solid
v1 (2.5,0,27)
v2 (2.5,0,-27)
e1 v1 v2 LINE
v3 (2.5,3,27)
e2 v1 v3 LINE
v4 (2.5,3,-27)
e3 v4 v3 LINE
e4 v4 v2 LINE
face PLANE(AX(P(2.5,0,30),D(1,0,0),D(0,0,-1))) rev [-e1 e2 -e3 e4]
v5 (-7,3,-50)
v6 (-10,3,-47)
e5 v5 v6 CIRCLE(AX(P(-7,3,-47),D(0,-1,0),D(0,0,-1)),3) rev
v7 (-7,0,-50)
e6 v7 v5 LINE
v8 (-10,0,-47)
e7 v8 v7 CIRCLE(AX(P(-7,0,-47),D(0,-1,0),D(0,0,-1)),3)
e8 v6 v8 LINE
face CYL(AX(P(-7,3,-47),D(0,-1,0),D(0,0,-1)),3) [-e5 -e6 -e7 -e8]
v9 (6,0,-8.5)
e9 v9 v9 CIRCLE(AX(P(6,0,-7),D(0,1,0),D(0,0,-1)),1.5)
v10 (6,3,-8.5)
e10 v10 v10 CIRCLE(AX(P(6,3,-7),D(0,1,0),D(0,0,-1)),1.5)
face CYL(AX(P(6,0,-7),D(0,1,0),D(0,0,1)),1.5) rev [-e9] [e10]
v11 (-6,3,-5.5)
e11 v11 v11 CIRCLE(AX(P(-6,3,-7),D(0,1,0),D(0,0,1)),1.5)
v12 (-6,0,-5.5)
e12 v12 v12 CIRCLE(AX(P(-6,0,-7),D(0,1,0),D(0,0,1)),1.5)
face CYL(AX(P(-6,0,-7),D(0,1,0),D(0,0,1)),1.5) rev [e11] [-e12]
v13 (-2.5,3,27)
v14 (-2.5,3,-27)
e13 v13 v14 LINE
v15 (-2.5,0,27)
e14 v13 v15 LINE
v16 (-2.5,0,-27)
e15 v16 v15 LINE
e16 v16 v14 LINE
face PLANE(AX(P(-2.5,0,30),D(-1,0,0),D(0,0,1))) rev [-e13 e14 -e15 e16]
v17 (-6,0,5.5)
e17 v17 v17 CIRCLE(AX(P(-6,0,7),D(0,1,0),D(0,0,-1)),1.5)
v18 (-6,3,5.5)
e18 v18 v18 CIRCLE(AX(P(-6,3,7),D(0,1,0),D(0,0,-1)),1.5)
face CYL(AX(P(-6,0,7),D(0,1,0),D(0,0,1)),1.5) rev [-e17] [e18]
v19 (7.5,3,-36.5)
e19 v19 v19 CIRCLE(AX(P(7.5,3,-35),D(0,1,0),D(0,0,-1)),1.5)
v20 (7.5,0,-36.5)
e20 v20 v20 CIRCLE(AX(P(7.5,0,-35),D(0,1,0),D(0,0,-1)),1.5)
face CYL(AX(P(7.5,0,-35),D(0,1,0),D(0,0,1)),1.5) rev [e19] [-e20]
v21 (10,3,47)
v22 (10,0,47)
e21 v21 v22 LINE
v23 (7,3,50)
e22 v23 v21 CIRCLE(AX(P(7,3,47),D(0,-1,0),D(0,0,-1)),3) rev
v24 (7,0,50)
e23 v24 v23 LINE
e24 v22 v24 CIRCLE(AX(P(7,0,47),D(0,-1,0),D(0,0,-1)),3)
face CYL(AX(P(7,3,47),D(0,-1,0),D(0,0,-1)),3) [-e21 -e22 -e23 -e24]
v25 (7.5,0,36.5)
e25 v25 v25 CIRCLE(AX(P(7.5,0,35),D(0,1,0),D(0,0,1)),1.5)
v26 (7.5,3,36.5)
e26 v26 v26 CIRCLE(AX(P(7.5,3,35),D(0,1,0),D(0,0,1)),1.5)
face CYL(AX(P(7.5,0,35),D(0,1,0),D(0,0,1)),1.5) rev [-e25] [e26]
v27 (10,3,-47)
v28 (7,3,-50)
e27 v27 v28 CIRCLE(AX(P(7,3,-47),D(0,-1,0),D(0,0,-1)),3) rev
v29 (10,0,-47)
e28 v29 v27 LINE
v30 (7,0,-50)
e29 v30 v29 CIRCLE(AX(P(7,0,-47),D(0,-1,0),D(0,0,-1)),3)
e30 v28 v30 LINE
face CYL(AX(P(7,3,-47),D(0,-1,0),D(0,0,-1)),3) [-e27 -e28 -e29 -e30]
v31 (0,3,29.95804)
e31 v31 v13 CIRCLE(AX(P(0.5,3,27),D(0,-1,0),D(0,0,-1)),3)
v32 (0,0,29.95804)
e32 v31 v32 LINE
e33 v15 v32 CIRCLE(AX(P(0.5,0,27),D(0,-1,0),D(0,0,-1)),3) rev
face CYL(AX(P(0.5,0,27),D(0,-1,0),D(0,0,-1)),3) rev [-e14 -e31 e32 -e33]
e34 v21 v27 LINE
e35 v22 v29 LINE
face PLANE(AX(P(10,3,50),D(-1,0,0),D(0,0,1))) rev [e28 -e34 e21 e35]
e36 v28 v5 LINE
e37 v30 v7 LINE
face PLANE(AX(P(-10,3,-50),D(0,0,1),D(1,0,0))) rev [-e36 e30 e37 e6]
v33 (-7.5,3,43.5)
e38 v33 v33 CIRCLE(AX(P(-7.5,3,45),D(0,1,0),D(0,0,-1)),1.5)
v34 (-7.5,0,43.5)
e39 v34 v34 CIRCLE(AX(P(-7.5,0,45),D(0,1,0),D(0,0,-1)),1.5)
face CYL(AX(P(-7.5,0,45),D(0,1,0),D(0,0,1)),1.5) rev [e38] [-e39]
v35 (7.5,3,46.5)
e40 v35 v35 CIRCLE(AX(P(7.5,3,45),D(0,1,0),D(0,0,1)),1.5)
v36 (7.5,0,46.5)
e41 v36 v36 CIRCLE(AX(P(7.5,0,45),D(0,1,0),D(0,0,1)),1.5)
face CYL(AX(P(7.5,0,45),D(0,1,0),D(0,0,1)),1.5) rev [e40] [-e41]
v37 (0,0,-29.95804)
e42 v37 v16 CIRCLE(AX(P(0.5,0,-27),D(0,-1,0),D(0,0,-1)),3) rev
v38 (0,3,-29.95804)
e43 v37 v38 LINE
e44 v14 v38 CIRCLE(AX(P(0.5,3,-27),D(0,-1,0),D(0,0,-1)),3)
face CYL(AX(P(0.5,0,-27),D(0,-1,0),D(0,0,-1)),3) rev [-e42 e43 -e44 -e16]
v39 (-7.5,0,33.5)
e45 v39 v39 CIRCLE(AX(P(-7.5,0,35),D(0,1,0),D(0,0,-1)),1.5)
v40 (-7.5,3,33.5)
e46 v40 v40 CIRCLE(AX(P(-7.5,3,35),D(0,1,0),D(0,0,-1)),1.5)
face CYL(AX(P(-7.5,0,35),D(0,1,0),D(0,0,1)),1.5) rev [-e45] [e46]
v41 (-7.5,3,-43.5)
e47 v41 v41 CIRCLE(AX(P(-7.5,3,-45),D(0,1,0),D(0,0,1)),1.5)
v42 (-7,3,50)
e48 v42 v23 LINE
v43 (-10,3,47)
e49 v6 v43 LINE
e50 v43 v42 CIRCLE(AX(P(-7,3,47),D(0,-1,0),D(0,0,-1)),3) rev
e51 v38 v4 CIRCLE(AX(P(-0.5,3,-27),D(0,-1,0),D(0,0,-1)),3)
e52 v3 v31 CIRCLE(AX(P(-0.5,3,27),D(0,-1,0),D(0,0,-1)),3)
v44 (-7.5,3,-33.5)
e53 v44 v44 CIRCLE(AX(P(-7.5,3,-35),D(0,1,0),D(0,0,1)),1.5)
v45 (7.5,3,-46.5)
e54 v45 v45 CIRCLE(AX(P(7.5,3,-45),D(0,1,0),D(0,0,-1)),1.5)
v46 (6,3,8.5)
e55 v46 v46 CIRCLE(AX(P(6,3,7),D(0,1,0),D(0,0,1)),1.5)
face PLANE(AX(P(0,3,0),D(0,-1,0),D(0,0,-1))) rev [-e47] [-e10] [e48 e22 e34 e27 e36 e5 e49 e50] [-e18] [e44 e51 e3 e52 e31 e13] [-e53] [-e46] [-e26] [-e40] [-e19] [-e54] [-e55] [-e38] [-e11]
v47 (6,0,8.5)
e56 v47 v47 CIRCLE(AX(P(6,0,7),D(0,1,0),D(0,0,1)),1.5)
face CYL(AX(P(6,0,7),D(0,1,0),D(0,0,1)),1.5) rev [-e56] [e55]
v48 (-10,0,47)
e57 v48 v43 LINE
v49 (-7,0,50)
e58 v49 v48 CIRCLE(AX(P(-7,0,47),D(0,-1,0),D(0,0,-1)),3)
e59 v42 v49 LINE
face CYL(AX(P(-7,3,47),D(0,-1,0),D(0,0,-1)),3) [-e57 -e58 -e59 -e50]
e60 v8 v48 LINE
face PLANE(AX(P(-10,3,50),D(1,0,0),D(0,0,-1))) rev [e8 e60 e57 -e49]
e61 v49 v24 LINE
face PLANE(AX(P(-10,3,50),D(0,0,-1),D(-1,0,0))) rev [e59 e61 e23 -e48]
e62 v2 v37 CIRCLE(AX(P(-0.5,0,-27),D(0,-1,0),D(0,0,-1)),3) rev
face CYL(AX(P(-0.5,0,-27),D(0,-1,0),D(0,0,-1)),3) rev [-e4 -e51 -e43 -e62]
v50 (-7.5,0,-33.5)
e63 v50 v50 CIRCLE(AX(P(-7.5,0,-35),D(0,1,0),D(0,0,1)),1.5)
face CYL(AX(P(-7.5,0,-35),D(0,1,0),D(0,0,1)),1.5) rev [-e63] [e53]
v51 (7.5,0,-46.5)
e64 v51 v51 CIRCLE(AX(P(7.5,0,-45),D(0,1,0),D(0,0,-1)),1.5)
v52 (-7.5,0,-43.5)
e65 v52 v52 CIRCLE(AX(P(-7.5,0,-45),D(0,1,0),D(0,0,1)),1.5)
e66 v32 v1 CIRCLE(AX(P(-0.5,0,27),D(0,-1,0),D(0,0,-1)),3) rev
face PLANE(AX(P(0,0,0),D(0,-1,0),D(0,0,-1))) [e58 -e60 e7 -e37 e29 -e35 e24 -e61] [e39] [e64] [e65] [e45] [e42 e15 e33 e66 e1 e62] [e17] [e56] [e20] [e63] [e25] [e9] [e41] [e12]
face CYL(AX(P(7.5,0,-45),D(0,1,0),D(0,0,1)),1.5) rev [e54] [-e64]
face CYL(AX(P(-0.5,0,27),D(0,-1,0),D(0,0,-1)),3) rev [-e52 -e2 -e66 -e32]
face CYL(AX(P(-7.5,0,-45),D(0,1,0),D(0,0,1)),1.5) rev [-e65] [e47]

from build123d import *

# Parameters (mm, degrees)
SKETCH_1_W               = 20
SKETCH_1_H               = 100
EXTRUDE_1_DEPTH          = 3
SKETCH_2_R               = 1.5
CUT_EXTRUDE_1_DEPTH      = 52.078371156
CUT_EXTRUDE_2_DEPTH      = 52.078371156
CUT_EXTRUDE_2_DEPTH_BACK = 52.078371156
SKETCH_3_W               = 5
SKETCH_3_H               = 60
FILLET_1_R               = 3
FILLET_2_R               = 3
SKETCH_4_R               = 1.5
CUT_EXTRUDE_3_DEPTH      = 52.078371156


with BuildPart() as part:
    # 草图1 → 凸台-拉伸1 (new body)
    with BuildSketch(Plane(origin=(0, 0, 0), x_dir=(1, 0, 0), z_dir=(0, 1, 0))):
        Rectangle(SKETCH_1_W, SKETCH_1_H)
    extrude(amount=EXTRUDE_1_DEPTH)

    # 草图2 → 切除-拉伸1 (cut, through all)
    with BuildSketch(Plane(origin=(0, 3, 0), x_dir=(1, 0, 0), z_dir=(0, 1, 0))):
        with Locations(Location((-7.5, 45, 0), (0, 0, 270))):
            Circle(SKETCH_2_R)
        with Locations(Location((-7.5, 35, 0), (0, 0, 270))):
            Circle(SKETCH_2_R)
        with Locations(Location((7.5, 45, 0), (0, 0, 90))):
            Circle(SKETCH_2_R)
        with Locations(Location((7.5, 35, 0), (0, 0, 90))):
            Circle(SKETCH_2_R)
        with Locations(Location((7.5, -35, 0), (0, 0, 270))):
            Circle(SKETCH_2_R)
        with Locations(Location((7.5, -45, 0), (0, 0, 270))):
            Circle(SKETCH_2_R)
        with Locations(Location((-7.5, -35, 0), (0, 0, 90))):
            Circle(SKETCH_2_R)
        with Locations(Location((-7.5, -45, 0), (0, 0, 90))):
            Circle(SKETCH_2_R)
    extrude(amount=-CUT_EXTRUDE_1_DEPTH, mode=Mode.SUBTRACT)

    # 草图3 → 切除-拉伸2 (cut, two sides: drawn at the far end of the back side and taken through both)
    with BuildSketch(Plane(origin=(0, 3, 0), x_dir=(1, 0, 0), z_dir=(0, 1, 0)).offset(-CUT_EXTRUDE_2_DEPTH_BACK)):
        Rectangle(SKETCH_3_W, SKETCH_3_H)
    extrude(amount=CUT_EXTRUDE_2_DEPTH + CUT_EXTRUDE_2_DEPTH_BACK, mode=Mode.SUBTRACT)

    # 圆角1
    # the kernel refuses this fillet: 3 mm, written as the material it adds along each edge
    with BuildSketch(Plane(origin=(-2.5, 3, -30), x_dir=(1, 0, 0), z_dir=(0, -1, 0)), Plane(origin=(-2.5, 3, 30), x_dir=(0, 0, -1), z_dir=(0, -1, 0)), Plane(origin=(2.5, 0, 30), x_dir=(0, 0, -1), z_dir=(0, 1, 0))) as fillet_1_piece_1:
        with BuildLine():
            CenterArc((FILLET_1_R, FILLET_1_R), FILLET_1_R, 180, 90)
            Line((0, FILLET_1_R), (0, 0))
            Line((0, 0), (FILLET_1_R, 0))
        make_face()
    extrude(amount=3)
    with BuildSketch(Plane(origin=(2.5, 0, -30), x_dir=(0, 0, 1), z_dir=(0, 1, 0))) as fillet_1_piece_2:
        with BuildLine():
            CenterArc((FILLET_1_R, -FILLET_1_R), FILLET_1_R, 90, 90)
            Line((0, -FILLET_1_R), (0, 0))
            Line((0, 0), (FILLET_1_R, 0))
        make_face()
    extrude(amount=3)

    # 圆角2
    fillet_2_edges = [part.edges().sort_by_distance(p)[0] for p in [
        (10, 1.5, 50),
        (-10, 1.5, 50),
        (-10, 1.5, -50),
        (10, 1.5, -50),
    ]]
    fillet(fillet_2_edges, radius=FILLET_2_R)

    # 草图4 → 切除-拉伸3 (cut, through all)
    with BuildSketch(Plane(origin=(0, 3, 0), x_dir=(1, 0, 0), z_dir=(0, 1, 0))):
        with Locations(Location((-6, 7, 0), (0, 0, 270))):
            Circle(SKETCH_4_R)
        with Locations(Location((6, 7, 0), (0, 0, 90))):
            Circle(SKETCH_4_R)
        with Locations(Location((6, -7, 0), (0, 0, 270))):
            Circle(SKETCH_4_R)
        with Locations(Location((-6, -7, 0), (0, 0, 90))):
            Circle(SKETCH_4_R)
    extrude(amount=-CUT_EXTRUDE_3_DEPTH, mode=Mode.SUBTRACT)


solid = part.part
